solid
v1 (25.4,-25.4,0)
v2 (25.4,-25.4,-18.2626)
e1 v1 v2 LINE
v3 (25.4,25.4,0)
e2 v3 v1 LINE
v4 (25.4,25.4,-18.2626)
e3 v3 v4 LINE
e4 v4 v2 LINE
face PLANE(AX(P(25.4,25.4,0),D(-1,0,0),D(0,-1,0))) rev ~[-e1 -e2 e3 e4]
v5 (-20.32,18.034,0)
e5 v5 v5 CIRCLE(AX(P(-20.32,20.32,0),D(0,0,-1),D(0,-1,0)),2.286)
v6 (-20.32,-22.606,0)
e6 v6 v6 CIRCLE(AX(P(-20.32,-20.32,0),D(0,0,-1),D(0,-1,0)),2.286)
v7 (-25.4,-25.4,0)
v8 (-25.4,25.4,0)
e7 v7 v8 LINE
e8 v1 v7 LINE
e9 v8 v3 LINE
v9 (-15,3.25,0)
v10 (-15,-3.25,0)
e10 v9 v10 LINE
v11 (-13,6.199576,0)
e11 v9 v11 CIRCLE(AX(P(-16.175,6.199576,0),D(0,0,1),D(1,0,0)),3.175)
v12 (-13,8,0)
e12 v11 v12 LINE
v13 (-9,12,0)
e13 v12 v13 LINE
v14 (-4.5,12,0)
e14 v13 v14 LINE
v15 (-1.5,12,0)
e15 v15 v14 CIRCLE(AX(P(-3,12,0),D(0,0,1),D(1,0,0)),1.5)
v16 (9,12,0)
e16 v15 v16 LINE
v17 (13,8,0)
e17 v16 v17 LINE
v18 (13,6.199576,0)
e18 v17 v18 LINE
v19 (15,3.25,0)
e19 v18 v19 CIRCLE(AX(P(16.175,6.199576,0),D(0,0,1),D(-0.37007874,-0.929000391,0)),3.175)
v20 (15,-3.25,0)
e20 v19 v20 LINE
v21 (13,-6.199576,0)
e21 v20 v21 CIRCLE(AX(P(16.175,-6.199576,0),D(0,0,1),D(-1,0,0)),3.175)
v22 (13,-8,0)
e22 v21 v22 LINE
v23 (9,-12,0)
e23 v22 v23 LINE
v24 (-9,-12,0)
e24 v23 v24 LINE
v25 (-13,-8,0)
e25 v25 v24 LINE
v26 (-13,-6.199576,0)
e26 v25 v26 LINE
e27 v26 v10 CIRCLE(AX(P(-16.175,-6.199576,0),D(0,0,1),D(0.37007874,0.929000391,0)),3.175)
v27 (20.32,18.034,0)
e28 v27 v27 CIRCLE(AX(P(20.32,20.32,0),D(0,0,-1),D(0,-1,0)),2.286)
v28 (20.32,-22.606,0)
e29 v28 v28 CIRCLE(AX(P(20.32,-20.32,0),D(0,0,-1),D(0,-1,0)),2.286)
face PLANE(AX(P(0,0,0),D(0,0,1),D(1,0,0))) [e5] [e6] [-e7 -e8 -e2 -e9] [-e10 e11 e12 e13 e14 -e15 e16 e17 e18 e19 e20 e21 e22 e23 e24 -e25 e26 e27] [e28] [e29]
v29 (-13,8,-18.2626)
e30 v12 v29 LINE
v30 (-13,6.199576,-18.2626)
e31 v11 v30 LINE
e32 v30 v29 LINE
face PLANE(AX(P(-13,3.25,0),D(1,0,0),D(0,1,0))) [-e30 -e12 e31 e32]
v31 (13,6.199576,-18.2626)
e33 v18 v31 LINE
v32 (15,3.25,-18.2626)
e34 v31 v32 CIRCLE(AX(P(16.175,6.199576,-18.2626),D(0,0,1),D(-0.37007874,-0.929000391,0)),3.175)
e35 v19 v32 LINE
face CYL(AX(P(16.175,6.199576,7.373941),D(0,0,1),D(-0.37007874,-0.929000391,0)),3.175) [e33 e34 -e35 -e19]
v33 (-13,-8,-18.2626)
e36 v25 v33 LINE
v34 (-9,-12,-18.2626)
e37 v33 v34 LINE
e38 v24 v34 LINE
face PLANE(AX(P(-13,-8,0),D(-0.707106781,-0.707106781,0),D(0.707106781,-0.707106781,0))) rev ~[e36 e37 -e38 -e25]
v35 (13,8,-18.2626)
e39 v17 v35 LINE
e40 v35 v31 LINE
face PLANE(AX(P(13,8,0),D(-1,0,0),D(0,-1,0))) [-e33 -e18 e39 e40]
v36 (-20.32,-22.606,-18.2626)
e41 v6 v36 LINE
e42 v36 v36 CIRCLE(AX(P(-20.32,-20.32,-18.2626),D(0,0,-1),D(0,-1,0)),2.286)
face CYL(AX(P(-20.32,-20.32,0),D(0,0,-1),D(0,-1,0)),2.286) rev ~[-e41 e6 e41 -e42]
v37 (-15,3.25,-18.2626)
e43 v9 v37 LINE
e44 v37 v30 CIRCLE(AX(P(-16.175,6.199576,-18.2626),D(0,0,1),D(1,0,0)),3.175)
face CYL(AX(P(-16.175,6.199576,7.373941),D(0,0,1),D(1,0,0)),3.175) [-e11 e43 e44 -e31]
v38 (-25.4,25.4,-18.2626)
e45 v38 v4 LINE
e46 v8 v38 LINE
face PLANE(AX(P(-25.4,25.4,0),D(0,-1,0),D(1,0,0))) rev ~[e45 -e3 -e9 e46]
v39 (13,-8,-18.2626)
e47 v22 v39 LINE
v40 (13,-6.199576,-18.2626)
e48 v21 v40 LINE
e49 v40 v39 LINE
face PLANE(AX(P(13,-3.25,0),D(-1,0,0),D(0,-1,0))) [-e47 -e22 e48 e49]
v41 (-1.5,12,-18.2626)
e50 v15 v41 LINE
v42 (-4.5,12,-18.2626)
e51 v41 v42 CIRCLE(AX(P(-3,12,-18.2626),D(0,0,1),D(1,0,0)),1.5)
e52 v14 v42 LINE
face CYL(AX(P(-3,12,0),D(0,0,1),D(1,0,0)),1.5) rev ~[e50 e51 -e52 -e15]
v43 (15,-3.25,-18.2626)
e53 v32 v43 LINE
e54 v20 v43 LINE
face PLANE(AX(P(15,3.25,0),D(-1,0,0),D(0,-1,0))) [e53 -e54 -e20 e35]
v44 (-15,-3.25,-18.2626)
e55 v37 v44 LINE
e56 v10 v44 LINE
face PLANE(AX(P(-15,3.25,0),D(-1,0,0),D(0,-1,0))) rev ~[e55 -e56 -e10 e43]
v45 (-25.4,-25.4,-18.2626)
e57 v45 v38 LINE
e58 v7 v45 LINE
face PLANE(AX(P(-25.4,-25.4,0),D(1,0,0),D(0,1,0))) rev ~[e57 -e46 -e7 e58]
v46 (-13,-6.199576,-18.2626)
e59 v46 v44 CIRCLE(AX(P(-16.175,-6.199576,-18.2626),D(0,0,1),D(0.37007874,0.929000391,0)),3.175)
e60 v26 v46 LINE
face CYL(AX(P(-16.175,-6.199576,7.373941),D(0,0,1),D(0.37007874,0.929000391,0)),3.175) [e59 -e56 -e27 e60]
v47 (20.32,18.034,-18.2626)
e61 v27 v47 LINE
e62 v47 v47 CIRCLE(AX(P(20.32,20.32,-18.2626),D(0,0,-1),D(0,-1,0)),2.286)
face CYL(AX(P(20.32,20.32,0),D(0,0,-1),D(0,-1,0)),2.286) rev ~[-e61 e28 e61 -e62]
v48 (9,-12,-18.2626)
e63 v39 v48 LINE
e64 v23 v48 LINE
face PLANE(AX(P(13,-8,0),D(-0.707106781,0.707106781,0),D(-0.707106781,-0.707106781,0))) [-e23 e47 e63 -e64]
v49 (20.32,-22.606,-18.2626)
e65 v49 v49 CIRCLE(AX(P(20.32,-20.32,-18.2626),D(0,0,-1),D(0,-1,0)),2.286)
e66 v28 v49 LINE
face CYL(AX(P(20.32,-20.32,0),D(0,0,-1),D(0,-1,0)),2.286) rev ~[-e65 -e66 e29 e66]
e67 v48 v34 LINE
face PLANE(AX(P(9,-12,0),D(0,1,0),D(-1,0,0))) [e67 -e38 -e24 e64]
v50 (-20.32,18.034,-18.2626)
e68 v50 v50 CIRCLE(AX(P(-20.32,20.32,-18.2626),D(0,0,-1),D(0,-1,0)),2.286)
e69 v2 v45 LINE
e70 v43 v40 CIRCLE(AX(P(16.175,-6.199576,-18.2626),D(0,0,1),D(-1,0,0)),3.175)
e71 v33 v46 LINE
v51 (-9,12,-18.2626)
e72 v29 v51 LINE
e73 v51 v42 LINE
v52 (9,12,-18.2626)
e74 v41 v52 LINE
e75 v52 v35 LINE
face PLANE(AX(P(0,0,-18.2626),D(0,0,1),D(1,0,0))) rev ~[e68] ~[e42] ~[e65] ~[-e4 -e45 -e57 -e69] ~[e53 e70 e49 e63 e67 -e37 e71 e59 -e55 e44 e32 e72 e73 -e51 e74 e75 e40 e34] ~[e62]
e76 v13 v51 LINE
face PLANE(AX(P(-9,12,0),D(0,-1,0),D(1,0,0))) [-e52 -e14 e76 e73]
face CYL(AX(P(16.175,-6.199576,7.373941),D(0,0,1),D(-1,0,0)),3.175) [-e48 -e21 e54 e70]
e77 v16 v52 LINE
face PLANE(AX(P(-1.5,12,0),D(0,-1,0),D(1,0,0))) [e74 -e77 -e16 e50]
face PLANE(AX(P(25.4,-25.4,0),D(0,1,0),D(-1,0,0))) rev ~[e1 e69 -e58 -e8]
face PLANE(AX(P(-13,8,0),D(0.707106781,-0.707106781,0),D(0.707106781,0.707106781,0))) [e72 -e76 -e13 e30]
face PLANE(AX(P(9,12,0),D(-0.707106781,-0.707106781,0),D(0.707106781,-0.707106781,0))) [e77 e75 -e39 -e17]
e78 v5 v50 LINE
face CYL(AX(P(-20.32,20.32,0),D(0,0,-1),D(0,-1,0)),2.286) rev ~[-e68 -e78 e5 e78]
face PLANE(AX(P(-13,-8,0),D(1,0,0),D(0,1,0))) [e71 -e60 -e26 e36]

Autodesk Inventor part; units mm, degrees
ref_plane "YZ Plane" through (0, 0, 0) normal (1, 0, 0) x (0, 1, 0)
ref_plane "XZ Plane" through (0, 0, 0) normal (0, 1, 0) x (-1, 0, 0)
ref_plane "XY Plane" through (0, 0, 0) normal (0, 0, 1) x (1, 0, 0)
sketch "Sketch1" plane through (0, 0, 0) normal (0, 0, 1) x (1, 0, 0)
  line L0 (-13, 12) -> (13, 12)
  line L1 (13, 12) -> (13, -12)
  line L2 (13, -12) -> (-13, -12)
  line L3 (-13, -12) -> (-13, 12)
  line L4 (-13, 3.25) -> (-15, 3.25)
  line L5 (-15, 3.25) -> (-15, -3.25)
  line L6 (-15, -3.25) -> (-13, -3.25)
  line L7 (-13, -3.25) -> (-13, 3.25)
  line L8 (13, 3.25) -> (15, 3.25)
  line L9 (15, 3.25) -> (15, -3.25)
  line L10 (15, -3.25) -> (13, -3.25)
  line L11 (13, -3.25) -> (13, 3.25)
  line L12 (-25.4, 25.4) -> (25.4, 25.4)
  line L13 (25.4, 25.4) -> (25.4, -25.4)
  line L14 (25.4, -25.4) -> (-25.4, -25.4)
  line L15 (-25.4, -25.4) -> (-25.4, 25.4)
  circle A0 centre (0, 0) radius 7.1437
  circle A1 centre (-3, 12) radius 1.5
  line L16 (-13, 8) -> (-9, 12)
  line L17 (9, 12) -> (13, 8)
  line L18 (13, -8) -> (9, -12)
  line L19 (-13, -8) -> (-9, -12)
  point P0 (-14, 3.25)
  point P1 (14, 3.25)
  point P2 (-14, -3.25)
  point P3 (14, -3.25)
  point P4 (-20.32, 20.32)
  point P5 (20.32, 20.32)
  point P6 (20.32, -20.32)
  point P7 (-20.32, -20.32)
  dimension "d0" = 24
  dimension "d1" = 12
  dimension "d2" = 26
  dimension "d3" = 13
  dimension "d4" = 2
  dimension "d5" = 6.5
  dimension "d6" = 3.25
  dimension "d7" = 2
  dimension "d8" = 14.2875
  dimension "d9" = 50.8
  dimension "d10" = 25.4
  dimension "d11" = 50.8
  dimension "d12" = 25.4
  dimension "d13" = 3
  dimension "d14" = 10
  dimension "d15" = 4
  dimension "d16" = 4
  dimension "d17" = 4
  dimension "d18" = 4
  dimension "d19" = 4
  dimension "d20" = 5.08
  dimension "d21" = 5.08
  dimension "d22" = 5.08
  dimension "d23" = 5.08
  dimension "d34" = 40.64
  dimension "d35" = 40.64
extrude "Extrusion1" add sketch "Sketch1" against normal blind 18.2626 contours L0 L16 L3 | L0 L1 L17 | L19 L2 L3 | L18 L1 L2 | L12 L13 L14 L15
fillet "Fillet1" radius 3.175 4 edges at (-13, -3.25, -9.1313) (-13, 3.25, -9.1313) (13, 3.25, -9.1313) (13, -3.25, -9.1313)
hole "Hole1" at (-20.32, 20.32, 0) at (20.32, 20.32, 0) at (20.32, -20.32, 0) at (-20.32, -20.32, 0) direction (0, 0, -1) diameter 4.572 end through all
thread "Thread1" size "10-32 UNF" class "2B" standard "ANSI Unified Screw Threads" full length
thread "Thread2" size "10-32 UNF" class "2B" standard "ANSI Unified Screw Threads" full length
thread "Thread3" size "10-32 UNF" class "2B" standard "ANSI Unified Screw Threads" full length
thread "Thread4" size "10-32 UNF" class "2B" standard "ANSI Unified Screw Threads" full length
equation "\"d1\" = 0.5 * d0"
equation "\"d3\" = 0.5 * d2"
equation "\"d6\" = 0.5 * d5"
equation "\"d7\" = d4"
equation "\"d10\" = 0.5 * d9"
equation "\"d12\" = 0.5 * d11"
equation "\"d16\" = d15"
equation "\"d17\" = d15"
equation "\"d18\" = d15"
equation "\"d19\" = d15"
equation "\"d22\" = d21"
equation "\"d23\" = d21"
properties part number "BD gearbox mount block"
